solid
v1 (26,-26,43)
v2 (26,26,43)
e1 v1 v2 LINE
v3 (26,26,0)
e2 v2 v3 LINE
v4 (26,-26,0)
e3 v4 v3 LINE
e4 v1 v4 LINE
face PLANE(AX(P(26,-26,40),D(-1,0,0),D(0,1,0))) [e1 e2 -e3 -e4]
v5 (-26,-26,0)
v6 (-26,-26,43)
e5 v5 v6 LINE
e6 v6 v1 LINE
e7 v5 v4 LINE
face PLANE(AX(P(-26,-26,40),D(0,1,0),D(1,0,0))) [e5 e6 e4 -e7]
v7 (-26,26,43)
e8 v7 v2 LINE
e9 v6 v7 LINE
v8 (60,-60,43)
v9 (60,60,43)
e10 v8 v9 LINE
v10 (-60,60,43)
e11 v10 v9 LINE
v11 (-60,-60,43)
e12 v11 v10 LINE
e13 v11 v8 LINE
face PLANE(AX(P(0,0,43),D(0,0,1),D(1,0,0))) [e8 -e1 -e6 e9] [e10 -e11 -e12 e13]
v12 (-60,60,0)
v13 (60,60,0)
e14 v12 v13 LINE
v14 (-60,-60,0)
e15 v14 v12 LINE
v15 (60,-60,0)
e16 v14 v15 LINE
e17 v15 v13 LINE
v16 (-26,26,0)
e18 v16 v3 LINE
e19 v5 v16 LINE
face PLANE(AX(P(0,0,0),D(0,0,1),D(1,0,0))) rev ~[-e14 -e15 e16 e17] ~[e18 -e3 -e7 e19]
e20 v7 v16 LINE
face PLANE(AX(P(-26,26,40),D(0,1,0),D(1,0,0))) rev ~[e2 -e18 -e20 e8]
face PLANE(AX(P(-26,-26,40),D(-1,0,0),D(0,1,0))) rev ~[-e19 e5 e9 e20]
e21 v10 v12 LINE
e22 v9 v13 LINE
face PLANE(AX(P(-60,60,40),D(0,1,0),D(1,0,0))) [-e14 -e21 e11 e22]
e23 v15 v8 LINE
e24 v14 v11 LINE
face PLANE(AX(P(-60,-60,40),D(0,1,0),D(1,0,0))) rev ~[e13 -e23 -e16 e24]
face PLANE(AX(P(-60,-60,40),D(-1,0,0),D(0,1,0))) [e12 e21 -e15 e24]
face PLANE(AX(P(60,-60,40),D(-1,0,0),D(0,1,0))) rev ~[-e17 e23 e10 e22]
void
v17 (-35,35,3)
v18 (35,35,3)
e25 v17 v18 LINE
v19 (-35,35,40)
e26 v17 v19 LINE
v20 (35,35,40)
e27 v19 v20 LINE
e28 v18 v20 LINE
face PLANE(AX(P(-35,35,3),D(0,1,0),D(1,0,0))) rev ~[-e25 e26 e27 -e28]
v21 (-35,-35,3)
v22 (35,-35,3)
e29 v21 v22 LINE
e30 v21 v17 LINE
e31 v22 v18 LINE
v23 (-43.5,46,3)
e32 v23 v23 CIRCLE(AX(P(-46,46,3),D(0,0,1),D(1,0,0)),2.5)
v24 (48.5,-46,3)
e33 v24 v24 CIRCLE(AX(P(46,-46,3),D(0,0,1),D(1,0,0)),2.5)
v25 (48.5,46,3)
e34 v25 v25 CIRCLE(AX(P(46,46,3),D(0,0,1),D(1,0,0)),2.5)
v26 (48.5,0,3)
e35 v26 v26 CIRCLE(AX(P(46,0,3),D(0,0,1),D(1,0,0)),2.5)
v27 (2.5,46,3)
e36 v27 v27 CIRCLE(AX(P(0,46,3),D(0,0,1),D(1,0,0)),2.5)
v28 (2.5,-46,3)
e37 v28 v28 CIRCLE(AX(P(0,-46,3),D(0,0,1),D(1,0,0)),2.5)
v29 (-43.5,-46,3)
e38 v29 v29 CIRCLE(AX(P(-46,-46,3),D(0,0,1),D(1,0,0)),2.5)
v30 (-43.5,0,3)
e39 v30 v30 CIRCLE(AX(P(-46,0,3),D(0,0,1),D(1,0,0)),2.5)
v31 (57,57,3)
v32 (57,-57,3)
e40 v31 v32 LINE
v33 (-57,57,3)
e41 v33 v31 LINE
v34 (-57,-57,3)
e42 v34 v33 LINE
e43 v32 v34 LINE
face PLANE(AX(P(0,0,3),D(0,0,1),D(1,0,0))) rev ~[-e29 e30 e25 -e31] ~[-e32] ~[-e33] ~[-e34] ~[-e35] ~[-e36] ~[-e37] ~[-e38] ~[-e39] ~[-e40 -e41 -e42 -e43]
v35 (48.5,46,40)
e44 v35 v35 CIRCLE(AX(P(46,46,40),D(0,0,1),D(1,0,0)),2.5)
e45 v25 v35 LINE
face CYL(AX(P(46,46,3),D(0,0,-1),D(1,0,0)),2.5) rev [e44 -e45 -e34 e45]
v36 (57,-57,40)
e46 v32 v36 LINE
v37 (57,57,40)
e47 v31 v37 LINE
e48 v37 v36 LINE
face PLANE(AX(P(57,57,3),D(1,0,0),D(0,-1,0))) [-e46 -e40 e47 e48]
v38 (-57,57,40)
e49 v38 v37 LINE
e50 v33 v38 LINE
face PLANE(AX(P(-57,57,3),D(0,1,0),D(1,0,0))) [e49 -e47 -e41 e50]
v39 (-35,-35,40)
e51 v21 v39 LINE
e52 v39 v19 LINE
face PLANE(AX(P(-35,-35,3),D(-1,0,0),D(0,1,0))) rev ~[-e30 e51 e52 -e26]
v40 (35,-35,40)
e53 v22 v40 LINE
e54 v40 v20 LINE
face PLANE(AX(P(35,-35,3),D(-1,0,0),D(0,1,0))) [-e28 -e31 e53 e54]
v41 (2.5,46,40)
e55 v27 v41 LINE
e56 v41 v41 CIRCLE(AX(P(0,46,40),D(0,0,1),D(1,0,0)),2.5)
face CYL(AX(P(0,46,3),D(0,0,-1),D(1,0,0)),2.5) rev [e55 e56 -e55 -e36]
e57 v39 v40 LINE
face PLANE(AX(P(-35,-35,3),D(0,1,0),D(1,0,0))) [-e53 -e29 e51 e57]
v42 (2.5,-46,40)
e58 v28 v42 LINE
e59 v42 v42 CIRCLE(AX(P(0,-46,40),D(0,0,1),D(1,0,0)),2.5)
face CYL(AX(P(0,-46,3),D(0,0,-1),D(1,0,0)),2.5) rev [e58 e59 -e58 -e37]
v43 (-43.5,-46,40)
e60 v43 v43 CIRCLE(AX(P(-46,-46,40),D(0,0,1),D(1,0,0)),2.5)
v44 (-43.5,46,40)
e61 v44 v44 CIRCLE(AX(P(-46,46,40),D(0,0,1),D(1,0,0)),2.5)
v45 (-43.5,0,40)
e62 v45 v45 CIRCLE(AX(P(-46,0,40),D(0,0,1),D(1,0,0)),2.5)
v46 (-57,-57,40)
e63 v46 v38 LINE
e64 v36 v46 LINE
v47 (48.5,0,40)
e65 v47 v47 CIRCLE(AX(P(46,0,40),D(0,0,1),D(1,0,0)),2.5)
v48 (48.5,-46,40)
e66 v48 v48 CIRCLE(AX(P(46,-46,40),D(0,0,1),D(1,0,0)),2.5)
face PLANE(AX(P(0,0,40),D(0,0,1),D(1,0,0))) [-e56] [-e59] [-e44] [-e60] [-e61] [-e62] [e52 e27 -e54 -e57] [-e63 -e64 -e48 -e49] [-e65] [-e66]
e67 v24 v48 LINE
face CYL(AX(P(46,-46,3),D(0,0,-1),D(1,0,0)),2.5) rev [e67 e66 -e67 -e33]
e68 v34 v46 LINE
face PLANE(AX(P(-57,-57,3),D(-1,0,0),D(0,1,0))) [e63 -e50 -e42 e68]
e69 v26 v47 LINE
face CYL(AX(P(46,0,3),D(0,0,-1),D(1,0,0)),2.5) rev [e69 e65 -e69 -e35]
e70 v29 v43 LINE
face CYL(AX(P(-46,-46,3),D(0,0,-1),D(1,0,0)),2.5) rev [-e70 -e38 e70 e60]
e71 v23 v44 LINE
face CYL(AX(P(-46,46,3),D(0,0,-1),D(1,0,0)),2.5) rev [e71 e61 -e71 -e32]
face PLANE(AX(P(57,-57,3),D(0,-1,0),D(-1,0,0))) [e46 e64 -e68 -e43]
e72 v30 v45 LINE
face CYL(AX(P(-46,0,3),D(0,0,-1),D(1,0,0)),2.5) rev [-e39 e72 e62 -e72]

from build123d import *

# Parameters (mm, degrees)
F0_W     = 120
F0_H     = 120
F1_DEPTH = 3
F2_W     = 52
F2_H     = 52
F3_DEPTH = 25
F2_W_2   = 120
F2_H_2   = 120
F2_W_3   = 70
F2_H_3   = 70
F2_R     = 2.5
F4_DEPTH = 37
F5_W     = 120
F5_H     = 120
F5_W_2   = 114
F5_H_2   = 114
F5_W_3   = 52
F5_H_3   = 52
F6_DEPTH = 3


with BuildPart() as f1:
    # F0 (on Top) → F1 (new body)
    with BuildSketch(Plane.XY):
        Rectangle(F0_W, F0_H)
    extrude(amount=F1_DEPTH)

    # F2 (on face) → F3 (cut)
    with BuildSketch(Plane.XY.offset(3)):
        Rectangle(F2_W, F2_H)
    extrude(amount=-F3_DEPTH, mode=Mode.SUBTRACT)

    # F2 (on face) → F4 (join)
    with BuildSketch(Plane.XY.offset(3)):
        Rectangle(F2_W_2, F2_H_2)
        Polygon((-57, -57), (-57, -35), (-57, 35), (-57, 57), (-35, 57), (35, 57), (57, 57), (57, 35), (57, -35), (57, -57), (35, -57), (-35, -57), align=None, mode=Mode.SUBTRACT)
        Rectangle(F2_W_3, F2_H_3)
        Rectangle(F2_W, F2_H, mode=Mode.SUBTRACT)
        with Locations((46, 46)):
            Circle(F2_R)
        with Locations((0, 46)):
            Circle(F2_R)
        with Locations((-46, 46)):
            Circle(F2_R)
        with Locations((-46, 0)):
            Circle(F2_R)
        with Locations((-46, -46)):
            Circle(F2_R)
        with Locations((0, -46)):
            Circle(F2_R)
        with Locations((46, -46)):
            Circle(F2_R)
        with Locations((46, 0)):
            Circle(F2_R)
    extrude(amount=F4_DEPTH)

    # F5 (on face) → F6 (join)
    with BuildSketch(Plane.XY.offset(40)):
        Rectangle(F5_W, F5_H)
        Rectangle(F5_W_2, F5_H_2, mode=Mode.SUBTRACT)
        Rectangle(F5_W_2, F5_H_2)
        Rectangle(F5_W_3, F5_H_3, mode=Mode.SUBTRACT)
    extrude(amount=F6_DEPTH)


solid = f1.part
